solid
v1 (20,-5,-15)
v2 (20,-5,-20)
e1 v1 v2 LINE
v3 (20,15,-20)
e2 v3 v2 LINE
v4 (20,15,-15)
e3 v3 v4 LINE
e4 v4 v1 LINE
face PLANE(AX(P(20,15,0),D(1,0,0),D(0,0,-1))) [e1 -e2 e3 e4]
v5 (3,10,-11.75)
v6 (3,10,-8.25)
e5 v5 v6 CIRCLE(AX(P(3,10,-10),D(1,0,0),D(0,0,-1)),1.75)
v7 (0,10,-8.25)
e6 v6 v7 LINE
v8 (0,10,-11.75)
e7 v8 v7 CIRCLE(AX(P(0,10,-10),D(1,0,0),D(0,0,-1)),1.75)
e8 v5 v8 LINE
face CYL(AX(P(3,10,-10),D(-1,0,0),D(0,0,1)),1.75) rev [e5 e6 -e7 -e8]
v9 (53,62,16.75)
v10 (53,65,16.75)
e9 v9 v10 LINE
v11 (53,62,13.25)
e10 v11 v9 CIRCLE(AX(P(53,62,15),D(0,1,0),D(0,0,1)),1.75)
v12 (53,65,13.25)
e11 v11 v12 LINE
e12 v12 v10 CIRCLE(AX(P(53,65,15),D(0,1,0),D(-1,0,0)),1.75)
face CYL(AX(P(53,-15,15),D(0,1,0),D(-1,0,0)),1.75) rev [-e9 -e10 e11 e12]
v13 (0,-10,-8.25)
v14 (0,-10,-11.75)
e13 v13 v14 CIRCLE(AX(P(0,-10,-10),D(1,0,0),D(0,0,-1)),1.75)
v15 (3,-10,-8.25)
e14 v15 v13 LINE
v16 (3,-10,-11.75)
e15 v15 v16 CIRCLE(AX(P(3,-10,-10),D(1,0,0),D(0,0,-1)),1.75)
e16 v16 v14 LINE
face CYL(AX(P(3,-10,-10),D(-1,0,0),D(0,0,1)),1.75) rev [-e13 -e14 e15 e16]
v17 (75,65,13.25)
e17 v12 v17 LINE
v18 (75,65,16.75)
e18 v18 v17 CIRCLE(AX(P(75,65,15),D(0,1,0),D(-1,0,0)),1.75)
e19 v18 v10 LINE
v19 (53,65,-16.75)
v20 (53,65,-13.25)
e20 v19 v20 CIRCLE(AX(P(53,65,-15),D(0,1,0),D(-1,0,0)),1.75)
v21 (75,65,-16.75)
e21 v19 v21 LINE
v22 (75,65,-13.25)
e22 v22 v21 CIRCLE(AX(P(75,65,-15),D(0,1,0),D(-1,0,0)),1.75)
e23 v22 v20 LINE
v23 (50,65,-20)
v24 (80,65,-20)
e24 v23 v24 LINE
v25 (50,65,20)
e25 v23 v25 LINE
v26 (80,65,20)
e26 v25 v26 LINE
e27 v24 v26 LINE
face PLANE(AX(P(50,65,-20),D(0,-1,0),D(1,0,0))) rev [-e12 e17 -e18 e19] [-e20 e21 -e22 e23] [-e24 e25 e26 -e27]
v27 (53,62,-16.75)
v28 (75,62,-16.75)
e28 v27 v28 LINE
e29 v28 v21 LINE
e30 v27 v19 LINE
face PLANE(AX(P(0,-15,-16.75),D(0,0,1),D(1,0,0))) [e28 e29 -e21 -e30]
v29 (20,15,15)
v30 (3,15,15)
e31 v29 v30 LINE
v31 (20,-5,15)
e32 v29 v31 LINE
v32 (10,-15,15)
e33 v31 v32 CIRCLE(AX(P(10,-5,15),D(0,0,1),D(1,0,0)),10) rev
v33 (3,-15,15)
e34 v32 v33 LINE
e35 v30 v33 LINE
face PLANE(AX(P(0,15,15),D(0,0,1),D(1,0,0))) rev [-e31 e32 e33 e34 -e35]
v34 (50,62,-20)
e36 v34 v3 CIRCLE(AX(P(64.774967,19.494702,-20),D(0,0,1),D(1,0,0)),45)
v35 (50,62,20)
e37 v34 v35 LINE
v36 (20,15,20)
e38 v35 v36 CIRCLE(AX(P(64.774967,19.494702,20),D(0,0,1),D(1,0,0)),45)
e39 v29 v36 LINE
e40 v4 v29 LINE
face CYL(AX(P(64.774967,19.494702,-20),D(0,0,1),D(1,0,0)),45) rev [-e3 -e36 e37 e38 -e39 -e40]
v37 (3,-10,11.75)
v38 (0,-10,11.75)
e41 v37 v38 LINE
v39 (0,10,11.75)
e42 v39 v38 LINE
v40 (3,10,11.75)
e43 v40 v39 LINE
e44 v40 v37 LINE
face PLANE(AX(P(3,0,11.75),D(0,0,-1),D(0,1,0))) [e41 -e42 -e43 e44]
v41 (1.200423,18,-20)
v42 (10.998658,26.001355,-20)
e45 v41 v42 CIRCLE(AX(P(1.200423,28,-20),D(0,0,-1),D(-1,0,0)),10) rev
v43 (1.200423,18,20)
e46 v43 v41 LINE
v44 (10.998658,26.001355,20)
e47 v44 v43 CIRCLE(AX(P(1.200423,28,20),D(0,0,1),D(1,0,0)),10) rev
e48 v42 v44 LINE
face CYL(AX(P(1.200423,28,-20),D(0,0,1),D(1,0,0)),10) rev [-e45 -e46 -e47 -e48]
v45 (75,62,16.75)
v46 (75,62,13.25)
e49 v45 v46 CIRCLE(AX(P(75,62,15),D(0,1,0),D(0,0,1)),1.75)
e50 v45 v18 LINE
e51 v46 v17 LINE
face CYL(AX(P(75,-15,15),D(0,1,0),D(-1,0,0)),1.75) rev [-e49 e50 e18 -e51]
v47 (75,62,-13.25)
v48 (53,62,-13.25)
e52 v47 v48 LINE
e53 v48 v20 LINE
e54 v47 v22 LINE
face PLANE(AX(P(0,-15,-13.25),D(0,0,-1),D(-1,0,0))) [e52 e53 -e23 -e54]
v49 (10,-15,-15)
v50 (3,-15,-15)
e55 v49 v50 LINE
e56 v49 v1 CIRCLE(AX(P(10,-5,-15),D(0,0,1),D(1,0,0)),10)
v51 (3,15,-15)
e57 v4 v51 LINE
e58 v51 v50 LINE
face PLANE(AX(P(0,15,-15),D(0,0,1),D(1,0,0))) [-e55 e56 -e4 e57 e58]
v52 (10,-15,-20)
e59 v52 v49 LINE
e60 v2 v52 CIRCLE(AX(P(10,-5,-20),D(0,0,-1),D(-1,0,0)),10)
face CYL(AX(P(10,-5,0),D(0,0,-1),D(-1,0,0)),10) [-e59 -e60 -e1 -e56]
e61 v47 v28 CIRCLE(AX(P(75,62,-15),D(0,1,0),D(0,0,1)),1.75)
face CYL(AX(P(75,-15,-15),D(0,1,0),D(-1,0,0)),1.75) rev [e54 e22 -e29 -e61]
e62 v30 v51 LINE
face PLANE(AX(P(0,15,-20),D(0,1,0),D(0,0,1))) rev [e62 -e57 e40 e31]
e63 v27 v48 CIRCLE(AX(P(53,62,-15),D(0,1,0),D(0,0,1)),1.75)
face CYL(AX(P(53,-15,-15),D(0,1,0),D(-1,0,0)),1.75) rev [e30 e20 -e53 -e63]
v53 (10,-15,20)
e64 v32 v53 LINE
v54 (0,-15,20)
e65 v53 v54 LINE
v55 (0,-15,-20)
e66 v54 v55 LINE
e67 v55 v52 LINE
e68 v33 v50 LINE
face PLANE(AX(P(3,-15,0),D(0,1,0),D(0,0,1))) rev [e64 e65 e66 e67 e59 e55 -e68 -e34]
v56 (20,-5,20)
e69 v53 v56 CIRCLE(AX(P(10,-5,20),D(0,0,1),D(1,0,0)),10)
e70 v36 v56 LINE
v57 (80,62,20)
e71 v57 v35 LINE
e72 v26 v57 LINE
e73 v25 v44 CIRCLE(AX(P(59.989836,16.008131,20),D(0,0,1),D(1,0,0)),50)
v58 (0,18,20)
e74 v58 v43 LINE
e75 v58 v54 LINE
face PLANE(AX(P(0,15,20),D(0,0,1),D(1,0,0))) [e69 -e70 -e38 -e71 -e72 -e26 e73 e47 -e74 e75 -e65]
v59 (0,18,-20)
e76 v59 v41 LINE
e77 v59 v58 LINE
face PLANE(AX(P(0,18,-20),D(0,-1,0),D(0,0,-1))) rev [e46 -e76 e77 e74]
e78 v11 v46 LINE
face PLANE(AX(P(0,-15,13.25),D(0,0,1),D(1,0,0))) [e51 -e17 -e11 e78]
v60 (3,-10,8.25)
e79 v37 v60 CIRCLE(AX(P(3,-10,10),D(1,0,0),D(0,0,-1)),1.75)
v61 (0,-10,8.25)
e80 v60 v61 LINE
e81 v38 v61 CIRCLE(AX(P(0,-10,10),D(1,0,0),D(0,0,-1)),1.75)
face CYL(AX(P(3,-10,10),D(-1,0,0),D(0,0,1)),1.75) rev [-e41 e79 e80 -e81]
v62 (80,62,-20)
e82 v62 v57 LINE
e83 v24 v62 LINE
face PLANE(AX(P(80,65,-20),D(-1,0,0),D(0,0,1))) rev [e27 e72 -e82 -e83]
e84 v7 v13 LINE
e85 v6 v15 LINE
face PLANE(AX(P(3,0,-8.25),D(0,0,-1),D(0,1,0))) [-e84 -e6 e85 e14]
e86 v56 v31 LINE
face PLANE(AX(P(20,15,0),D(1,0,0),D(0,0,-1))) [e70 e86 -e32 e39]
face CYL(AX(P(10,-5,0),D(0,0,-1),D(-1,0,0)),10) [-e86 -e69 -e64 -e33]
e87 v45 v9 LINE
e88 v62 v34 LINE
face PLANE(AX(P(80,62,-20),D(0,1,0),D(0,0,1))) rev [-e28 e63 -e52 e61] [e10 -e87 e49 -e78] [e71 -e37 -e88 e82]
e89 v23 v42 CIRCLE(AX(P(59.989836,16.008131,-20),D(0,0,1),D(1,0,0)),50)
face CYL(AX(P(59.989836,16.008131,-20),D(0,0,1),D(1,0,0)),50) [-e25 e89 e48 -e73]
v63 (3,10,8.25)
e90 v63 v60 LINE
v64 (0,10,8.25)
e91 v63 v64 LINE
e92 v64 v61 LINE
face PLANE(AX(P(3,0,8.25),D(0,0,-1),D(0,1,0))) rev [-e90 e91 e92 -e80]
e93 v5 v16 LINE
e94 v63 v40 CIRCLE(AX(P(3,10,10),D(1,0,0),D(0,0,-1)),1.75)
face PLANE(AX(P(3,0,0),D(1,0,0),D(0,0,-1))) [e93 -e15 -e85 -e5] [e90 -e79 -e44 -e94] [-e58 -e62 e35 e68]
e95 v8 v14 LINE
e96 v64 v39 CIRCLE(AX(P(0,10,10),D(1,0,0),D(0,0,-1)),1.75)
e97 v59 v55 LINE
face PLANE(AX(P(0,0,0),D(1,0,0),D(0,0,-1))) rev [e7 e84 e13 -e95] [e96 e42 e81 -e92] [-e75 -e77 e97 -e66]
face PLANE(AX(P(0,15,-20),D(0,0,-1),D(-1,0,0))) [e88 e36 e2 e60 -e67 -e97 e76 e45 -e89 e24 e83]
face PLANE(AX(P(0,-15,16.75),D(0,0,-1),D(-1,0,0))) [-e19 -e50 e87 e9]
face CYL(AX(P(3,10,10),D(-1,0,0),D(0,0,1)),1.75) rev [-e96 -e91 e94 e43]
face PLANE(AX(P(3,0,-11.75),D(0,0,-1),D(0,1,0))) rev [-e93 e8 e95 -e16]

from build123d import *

# Parameters (mm, degrees)
SKETCH_1_W            = 30
SKETCH_1_H            = 30
EXTRUDE_1_DEPTH       = 3
EXTRUDE_2_DEPTH       = 30
EXTRUDE_3_DEPTH       = 40
FILLET_1_R            = 10
CUT_EXTRUDE_START     = -20
CUT_EXTRUDE_1_DEPTH   = 40
CUT_EXTRUDE_START_2   = -3
CUT_EXTRUDE_1_2_DEPTH = 3


# Read off the part's stored shape, not the designer's step: 切除-拉伸1
with BuildPart() as part:
    # 草图1 → 凸台-拉伸1 (new body)
    with BuildSketch(Plane(origin=(0, 0, 0), x_dir=(0, 0, -1), z_dir=(1, 0, 0))):
        Rectangle(SKETCH_1_W, SKETCH_1_H)
        with BuildLine():
            Line((-11.75, -10), (-11.75, 10))
            ThreePointArc((-11.75, 10), (-10, 11.75), (-8.25, 10))
            Line((-8.25, 10), (-8.25, -10))
            ThreePointArc((-8.25, -10), (-10, -11.75), (-11.75, -10))
        make_face(mode=Mode.SUBTRACT)
        with BuildLine():
            ThreePointArc((8.25, 10), (10, 11.75), (11.75, 10))
            Line((11.75, 10), (11.75, -10))
            ThreePointArc((11.75, -10), (10, -11.75), (8.25, -10))
            Line((8.25, -10), (8.25, 10))
        make_face(mode=Mode.SUBTRACT)
    extrude(amount=EXTRUDE_1_DEPTH)

    # 草图2 → 凸台-拉伸2 (add)
    with BuildSketch(Plane.XZ.offset(15)):
        Polygon((20, -20), (20, -15), (3, -15), (0, -15), (0, -20), align=None)
        Polygon((20, 20), (0, 20), (0, 15), (3, 15), (20, 15), align=None)
    extrude(amount=-EXTRUDE_2_DEPTH)

    # 草图3 → 凸台-拉伸3 (add)
    with BuildSketch(Plane.XY.offset(20)):
        with BuildLine():
            ThreePointArc((50, 65), (21.901058366, 48.400183617), (10.029526833, 18))
            Line((10.029526833, 18), (0, 18))
            Line((0, 18), (0, 15))
            Line((0, 15), (20, 15))
            ThreePointArc((20, 15), (26.843467388, 43.706297412), (50, 62))
            Line((50, 62), (80, 62))
            Line((80, 62), (80, 65))
            Line((80, 65), (50, 65))
        make_face()
    extrude(amount=-EXTRUDE_3_DEPTH)

    # 圆角1
    fillet_1_edges = [part.edges().sort_by_distance(p)[0] for p in [
        (10.029526833, 18, 0),
    ]]
    fillet(fillet_1_edges, radius=FILLET_1_R)

    # 切除-拉伸1 outline → 切除-拉伸1 (cut)
    with BuildSketch(Plane.XY.offset(CUT_EXTRUDE_START)):
        with BuildLine():
            Line((20, -15), (20, -5))
            ThreePointArc((20, -5), (17.071067812, -12.071067812), (10, -15))
            Line((10, -15), (20, -15))
        make_face()
    extrude(amount=CUT_EXTRUDE_1_DEPTH, mode=Mode.SUBTRACT)

    # Cut-Extrude 1 2 outline → Cut-Extrude 1 2 (cut)
    with BuildSketch(Plane(origin=(0, 65, 0), x_dir=(1, 0, 0), z_dir=(0, 1, 0)).offset(CUT_EXTRUDE_START_2)):
        with BuildLine():
            Line((75, 16.75), (53, 16.75))
            ThreePointArc((53, 16.75), (51.25, 15), (53, 13.25))
            Line((53, 13.25), (75, 13.25))
            ThreePointArc((75, 13.25), (76.75, 15), (75, 16.75))
        make_face()
        with BuildLine():
            Line((75, -13.25), (53, -13.25))
            ThreePointArc((53, -13.25), (51.25, -15), (53, -16.75))
            Line((53, -16.75), (75, -16.75))
            ThreePointArc((75, -16.75), (76.75, -15), (75, -13.25))
        make_face()
    extrude(amount=CUT_EXTRUDE_1_2_DEPTH, mode=Mode.SUBTRACT)


solid = part.part
